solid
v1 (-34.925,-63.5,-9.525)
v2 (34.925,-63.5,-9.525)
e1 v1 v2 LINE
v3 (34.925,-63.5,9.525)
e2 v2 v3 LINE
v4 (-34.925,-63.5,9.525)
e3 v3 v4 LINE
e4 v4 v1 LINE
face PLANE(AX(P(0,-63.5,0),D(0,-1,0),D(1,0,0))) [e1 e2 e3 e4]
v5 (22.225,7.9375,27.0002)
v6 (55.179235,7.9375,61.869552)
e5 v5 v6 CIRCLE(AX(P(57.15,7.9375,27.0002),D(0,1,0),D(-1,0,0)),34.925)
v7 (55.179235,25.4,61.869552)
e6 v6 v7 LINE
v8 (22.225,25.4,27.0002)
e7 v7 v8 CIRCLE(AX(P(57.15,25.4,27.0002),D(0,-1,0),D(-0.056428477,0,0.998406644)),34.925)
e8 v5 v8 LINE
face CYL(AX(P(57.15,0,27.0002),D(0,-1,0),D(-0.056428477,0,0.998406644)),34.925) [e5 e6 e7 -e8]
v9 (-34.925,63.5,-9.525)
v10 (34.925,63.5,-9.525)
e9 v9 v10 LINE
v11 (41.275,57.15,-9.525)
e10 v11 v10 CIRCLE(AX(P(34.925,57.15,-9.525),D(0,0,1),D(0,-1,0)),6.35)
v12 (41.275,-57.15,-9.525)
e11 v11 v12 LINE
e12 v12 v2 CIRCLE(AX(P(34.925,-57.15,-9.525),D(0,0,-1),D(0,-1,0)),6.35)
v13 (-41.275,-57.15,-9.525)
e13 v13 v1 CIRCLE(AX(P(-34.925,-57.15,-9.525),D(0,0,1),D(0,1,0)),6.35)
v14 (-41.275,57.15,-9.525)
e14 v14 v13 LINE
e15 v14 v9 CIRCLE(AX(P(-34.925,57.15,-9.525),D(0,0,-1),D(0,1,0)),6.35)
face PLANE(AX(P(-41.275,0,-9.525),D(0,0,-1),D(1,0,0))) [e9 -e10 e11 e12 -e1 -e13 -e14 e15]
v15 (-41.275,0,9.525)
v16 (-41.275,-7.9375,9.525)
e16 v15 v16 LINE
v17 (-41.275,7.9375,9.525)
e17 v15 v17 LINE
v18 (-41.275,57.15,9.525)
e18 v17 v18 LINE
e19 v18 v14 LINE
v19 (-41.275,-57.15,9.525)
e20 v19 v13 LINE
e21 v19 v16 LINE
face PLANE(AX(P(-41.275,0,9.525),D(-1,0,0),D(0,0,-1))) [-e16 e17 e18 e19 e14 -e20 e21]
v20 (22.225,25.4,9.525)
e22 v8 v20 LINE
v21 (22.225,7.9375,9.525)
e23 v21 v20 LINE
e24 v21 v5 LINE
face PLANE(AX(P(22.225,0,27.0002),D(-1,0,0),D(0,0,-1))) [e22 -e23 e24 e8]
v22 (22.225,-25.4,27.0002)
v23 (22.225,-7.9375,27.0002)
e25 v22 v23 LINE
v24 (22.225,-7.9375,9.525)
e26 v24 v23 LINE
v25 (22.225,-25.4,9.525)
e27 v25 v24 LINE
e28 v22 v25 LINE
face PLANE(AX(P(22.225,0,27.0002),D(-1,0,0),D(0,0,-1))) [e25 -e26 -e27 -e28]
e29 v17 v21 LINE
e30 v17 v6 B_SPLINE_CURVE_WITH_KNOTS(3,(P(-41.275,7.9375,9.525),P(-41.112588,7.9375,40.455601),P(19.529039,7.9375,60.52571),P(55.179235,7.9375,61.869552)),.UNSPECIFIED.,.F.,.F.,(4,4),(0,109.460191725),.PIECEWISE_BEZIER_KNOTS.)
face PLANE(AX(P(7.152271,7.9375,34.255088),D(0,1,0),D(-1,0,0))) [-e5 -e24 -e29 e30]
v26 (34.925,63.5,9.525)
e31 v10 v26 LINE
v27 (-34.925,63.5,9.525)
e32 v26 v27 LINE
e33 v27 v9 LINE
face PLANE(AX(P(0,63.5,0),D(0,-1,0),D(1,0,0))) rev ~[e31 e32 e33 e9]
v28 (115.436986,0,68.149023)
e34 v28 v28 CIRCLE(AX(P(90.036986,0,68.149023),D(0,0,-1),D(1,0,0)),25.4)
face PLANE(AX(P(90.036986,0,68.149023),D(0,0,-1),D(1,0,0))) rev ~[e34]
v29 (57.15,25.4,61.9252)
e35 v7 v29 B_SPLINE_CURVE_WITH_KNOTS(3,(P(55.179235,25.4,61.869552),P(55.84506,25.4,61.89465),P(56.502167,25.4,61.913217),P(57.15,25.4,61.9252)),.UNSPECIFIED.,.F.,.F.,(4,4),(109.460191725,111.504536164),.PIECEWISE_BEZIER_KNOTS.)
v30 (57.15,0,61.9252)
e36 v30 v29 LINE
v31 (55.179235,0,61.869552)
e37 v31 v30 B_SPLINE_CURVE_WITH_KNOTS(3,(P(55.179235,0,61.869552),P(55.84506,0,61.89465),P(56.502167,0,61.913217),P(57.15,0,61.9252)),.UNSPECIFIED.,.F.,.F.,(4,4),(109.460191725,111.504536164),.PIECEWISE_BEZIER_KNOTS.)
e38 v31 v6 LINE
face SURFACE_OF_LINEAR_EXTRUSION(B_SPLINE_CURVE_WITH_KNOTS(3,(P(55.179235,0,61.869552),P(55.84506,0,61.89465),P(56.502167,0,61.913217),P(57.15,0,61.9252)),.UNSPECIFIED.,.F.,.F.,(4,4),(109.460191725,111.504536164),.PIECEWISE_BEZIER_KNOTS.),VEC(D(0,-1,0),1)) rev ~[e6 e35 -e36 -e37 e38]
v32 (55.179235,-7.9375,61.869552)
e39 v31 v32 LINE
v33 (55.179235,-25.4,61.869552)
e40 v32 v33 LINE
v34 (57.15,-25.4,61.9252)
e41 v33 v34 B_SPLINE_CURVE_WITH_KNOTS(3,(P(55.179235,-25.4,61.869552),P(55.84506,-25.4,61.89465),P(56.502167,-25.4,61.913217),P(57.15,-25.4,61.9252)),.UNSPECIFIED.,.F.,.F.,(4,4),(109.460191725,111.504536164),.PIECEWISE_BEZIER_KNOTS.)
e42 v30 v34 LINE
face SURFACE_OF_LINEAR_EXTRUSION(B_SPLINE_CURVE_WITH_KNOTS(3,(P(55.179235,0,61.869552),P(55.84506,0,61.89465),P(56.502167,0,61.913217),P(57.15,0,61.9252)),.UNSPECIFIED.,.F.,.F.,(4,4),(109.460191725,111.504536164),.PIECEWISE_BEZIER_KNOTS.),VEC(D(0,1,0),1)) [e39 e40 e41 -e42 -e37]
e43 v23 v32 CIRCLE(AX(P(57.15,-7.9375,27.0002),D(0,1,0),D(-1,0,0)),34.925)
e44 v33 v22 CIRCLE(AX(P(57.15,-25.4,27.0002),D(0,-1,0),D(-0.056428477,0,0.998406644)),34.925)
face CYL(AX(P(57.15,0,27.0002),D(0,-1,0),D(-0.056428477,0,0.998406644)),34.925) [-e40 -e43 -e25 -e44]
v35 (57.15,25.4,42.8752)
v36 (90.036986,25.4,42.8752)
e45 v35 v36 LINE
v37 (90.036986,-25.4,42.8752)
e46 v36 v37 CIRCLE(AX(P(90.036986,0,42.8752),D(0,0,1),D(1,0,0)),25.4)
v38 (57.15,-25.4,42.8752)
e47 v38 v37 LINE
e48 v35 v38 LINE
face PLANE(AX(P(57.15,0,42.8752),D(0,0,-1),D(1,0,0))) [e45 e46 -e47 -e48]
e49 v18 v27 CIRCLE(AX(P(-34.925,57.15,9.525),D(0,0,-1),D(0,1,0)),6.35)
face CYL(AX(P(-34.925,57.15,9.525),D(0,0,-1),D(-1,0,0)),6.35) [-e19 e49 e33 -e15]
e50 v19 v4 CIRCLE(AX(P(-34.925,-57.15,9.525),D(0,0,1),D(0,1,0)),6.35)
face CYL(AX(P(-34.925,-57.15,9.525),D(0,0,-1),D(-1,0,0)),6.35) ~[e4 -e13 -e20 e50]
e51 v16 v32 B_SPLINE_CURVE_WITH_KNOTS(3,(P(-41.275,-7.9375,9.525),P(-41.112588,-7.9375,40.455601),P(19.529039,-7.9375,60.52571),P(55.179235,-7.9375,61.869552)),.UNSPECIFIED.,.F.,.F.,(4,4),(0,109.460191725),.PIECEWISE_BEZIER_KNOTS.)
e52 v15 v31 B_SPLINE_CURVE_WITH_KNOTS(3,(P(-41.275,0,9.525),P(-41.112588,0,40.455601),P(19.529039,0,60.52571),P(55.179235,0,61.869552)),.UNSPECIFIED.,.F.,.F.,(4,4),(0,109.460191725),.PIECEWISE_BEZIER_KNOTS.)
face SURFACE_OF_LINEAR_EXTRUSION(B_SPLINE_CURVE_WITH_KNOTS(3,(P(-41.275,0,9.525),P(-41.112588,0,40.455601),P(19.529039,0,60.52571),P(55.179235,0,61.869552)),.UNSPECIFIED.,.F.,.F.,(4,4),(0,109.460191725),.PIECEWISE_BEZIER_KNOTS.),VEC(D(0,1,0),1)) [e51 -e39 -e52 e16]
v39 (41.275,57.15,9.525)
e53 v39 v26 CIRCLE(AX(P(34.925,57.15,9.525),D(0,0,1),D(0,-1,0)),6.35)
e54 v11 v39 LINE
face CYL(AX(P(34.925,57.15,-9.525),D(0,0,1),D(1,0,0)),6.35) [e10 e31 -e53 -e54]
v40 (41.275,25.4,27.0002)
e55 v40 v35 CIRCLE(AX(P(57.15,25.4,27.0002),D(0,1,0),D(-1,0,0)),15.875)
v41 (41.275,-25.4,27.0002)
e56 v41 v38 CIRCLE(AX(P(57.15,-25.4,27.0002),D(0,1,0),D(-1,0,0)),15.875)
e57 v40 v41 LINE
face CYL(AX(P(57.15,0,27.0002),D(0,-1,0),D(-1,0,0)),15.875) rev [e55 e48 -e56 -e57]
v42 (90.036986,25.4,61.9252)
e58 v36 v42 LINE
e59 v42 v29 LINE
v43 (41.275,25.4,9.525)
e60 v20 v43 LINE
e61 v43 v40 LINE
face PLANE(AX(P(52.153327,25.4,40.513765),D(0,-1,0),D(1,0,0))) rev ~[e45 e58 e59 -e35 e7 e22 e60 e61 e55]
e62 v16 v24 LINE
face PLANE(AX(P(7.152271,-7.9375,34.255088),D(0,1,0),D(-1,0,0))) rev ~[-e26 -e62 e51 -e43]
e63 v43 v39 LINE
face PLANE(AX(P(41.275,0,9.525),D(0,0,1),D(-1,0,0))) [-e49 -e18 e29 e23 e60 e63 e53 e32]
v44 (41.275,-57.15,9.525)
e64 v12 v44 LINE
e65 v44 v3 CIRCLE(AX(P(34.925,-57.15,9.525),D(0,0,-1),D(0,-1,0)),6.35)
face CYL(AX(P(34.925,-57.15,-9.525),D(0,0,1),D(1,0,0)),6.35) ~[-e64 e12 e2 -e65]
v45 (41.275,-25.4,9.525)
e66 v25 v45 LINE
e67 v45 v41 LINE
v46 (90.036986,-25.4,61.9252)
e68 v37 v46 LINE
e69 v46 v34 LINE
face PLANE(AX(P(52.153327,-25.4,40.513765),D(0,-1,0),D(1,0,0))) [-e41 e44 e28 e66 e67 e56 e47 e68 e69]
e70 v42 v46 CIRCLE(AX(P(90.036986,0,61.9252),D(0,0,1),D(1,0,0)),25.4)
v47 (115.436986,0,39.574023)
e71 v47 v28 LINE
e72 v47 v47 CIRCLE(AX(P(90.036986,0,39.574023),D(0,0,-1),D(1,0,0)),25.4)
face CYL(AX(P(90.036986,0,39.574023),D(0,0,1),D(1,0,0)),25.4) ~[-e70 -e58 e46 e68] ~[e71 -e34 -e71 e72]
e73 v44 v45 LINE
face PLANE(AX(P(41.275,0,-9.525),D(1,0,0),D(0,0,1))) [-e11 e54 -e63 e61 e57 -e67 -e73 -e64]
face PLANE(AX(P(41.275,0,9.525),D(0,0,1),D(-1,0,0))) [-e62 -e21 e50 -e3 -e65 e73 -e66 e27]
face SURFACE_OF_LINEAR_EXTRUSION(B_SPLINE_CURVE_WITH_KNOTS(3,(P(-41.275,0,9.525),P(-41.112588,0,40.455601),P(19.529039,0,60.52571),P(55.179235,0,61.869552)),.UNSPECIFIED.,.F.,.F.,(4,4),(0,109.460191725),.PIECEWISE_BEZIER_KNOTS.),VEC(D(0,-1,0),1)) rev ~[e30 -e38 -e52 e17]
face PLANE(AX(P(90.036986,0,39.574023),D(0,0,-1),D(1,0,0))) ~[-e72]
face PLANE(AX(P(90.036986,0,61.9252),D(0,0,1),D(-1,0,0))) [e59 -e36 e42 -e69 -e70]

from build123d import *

# Parameters (mm, degrees)
F1_DEPTH = 63.5
F2_DEPTH = 7.9375
F3_DEPTH = 25.4
F5_R     = 6.35


# Not quite as in the source:
# - a feature names something its author has since deleted; it is built from what else it names


with BuildPart() as f1:
    # F0 (on Front) → F1 (new body, symmetric)
    with BuildSketch(Plane.XZ):
        Polygon((-41.275, 9.525), (-41.275, -9.525), (41.275, -9.525), (41.275, 9.525), (22.225, 9.525), align=None)
    extrude(amount=F1_DEPTH, both=True)

    # F0 (on Front) → F2 (join, symmetric)
    with BuildSketch(Plane.XZ):
        with BuildLine():
            add(Edge.make_bspline(
                [(-41.275, 9.525), (-41.112587778, 40.4556006324), (19.5290392467, 60.5257095831), (55.1792354288, 61.8695520445)],
                knots=[0, 0, 0, 0, 109.4601917253, 109.4601917253, 109.4601917253, 109.4601917253], degree=3))
            Line((-41.275, 9.525), (22.225, 9.525))
            Line((22.225, 9.525), (22.225, 27.0002))
            ThreePointArc((22.225, 27.0002), (31.7670866758, 50.9890168982), (55.1792354288, 61.8695520445))
        make_face()
    extrude(amount=F2_DEPTH, both=True)

    # F0 (on Front) → F3 (join, symmetric)
    with BuildSketch(Plane.XZ):
        with BuildLine():
            Line((22.225, 9.525), (41.275, 9.525))
            Line((41.275, 9.525), (41.275, 27.0002))
            ThreePointArc((41.275, 27.0002), (45.9246798487, 38.2255201513), (57.15, 42.8752))
            Line((57.15, 42.8752), (90.0369858318, 42.8752))
            Line((90.0369858318, 42.8752), (90.0369858318, 61.9252))
            Line((90.0369858318, 61.9252), (57.15, 61.9252))
            add(Edge.make_bspline(
                [(55.1792354288, 61.8695520445), (55.8450599549, 61.8946504554), (56.5021670835, 61.9132168549), (57.15, 61.9252)],
                knots=[109.4601917253, 109.4601917253, 109.4601917253, 109.4601917253, 111.5045361635, 111.5045361635, 111.5045361635, 111.5045361635], degree=3))
            ThreePointArc((55.1792354288, 61.8695520445), (31.7670866758, 50.9890168982), (22.225, 27.0002))
            Line((22.225, 27.0002), (22.225, 9.525))
        make_face()
    extrude(amount=F3_DEPTH, both=True)

    # F0 (on Front) → F4 (revolve)
    with BuildSketch(Plane.XZ):
        Polygon((90.0369858318, 68.1490233362), (90.0369858318, 61.9252), (90.0369858318, 42.8752), (90.0369858318, 39.5740233362), (115.4369858318, 39.5740233362), (115.4369858318, 68.1490233362), align=None)
    revolve(axis=Axis((90.0369858318, 0, 53.8615233362), (0, 0, -1)))

    # F5
    f5_edges = [f1.edges().sort_by_distance(p)[0] for p in [
        (-41.275, -63.5, 0),
        (41.275, -63.5, 0),
        (41.275, 63.5, 0),
        (-41.275, 63.5, 0),
    ]]
    fillet(f5_edges, radius=F5_R)


solid = f1.part
